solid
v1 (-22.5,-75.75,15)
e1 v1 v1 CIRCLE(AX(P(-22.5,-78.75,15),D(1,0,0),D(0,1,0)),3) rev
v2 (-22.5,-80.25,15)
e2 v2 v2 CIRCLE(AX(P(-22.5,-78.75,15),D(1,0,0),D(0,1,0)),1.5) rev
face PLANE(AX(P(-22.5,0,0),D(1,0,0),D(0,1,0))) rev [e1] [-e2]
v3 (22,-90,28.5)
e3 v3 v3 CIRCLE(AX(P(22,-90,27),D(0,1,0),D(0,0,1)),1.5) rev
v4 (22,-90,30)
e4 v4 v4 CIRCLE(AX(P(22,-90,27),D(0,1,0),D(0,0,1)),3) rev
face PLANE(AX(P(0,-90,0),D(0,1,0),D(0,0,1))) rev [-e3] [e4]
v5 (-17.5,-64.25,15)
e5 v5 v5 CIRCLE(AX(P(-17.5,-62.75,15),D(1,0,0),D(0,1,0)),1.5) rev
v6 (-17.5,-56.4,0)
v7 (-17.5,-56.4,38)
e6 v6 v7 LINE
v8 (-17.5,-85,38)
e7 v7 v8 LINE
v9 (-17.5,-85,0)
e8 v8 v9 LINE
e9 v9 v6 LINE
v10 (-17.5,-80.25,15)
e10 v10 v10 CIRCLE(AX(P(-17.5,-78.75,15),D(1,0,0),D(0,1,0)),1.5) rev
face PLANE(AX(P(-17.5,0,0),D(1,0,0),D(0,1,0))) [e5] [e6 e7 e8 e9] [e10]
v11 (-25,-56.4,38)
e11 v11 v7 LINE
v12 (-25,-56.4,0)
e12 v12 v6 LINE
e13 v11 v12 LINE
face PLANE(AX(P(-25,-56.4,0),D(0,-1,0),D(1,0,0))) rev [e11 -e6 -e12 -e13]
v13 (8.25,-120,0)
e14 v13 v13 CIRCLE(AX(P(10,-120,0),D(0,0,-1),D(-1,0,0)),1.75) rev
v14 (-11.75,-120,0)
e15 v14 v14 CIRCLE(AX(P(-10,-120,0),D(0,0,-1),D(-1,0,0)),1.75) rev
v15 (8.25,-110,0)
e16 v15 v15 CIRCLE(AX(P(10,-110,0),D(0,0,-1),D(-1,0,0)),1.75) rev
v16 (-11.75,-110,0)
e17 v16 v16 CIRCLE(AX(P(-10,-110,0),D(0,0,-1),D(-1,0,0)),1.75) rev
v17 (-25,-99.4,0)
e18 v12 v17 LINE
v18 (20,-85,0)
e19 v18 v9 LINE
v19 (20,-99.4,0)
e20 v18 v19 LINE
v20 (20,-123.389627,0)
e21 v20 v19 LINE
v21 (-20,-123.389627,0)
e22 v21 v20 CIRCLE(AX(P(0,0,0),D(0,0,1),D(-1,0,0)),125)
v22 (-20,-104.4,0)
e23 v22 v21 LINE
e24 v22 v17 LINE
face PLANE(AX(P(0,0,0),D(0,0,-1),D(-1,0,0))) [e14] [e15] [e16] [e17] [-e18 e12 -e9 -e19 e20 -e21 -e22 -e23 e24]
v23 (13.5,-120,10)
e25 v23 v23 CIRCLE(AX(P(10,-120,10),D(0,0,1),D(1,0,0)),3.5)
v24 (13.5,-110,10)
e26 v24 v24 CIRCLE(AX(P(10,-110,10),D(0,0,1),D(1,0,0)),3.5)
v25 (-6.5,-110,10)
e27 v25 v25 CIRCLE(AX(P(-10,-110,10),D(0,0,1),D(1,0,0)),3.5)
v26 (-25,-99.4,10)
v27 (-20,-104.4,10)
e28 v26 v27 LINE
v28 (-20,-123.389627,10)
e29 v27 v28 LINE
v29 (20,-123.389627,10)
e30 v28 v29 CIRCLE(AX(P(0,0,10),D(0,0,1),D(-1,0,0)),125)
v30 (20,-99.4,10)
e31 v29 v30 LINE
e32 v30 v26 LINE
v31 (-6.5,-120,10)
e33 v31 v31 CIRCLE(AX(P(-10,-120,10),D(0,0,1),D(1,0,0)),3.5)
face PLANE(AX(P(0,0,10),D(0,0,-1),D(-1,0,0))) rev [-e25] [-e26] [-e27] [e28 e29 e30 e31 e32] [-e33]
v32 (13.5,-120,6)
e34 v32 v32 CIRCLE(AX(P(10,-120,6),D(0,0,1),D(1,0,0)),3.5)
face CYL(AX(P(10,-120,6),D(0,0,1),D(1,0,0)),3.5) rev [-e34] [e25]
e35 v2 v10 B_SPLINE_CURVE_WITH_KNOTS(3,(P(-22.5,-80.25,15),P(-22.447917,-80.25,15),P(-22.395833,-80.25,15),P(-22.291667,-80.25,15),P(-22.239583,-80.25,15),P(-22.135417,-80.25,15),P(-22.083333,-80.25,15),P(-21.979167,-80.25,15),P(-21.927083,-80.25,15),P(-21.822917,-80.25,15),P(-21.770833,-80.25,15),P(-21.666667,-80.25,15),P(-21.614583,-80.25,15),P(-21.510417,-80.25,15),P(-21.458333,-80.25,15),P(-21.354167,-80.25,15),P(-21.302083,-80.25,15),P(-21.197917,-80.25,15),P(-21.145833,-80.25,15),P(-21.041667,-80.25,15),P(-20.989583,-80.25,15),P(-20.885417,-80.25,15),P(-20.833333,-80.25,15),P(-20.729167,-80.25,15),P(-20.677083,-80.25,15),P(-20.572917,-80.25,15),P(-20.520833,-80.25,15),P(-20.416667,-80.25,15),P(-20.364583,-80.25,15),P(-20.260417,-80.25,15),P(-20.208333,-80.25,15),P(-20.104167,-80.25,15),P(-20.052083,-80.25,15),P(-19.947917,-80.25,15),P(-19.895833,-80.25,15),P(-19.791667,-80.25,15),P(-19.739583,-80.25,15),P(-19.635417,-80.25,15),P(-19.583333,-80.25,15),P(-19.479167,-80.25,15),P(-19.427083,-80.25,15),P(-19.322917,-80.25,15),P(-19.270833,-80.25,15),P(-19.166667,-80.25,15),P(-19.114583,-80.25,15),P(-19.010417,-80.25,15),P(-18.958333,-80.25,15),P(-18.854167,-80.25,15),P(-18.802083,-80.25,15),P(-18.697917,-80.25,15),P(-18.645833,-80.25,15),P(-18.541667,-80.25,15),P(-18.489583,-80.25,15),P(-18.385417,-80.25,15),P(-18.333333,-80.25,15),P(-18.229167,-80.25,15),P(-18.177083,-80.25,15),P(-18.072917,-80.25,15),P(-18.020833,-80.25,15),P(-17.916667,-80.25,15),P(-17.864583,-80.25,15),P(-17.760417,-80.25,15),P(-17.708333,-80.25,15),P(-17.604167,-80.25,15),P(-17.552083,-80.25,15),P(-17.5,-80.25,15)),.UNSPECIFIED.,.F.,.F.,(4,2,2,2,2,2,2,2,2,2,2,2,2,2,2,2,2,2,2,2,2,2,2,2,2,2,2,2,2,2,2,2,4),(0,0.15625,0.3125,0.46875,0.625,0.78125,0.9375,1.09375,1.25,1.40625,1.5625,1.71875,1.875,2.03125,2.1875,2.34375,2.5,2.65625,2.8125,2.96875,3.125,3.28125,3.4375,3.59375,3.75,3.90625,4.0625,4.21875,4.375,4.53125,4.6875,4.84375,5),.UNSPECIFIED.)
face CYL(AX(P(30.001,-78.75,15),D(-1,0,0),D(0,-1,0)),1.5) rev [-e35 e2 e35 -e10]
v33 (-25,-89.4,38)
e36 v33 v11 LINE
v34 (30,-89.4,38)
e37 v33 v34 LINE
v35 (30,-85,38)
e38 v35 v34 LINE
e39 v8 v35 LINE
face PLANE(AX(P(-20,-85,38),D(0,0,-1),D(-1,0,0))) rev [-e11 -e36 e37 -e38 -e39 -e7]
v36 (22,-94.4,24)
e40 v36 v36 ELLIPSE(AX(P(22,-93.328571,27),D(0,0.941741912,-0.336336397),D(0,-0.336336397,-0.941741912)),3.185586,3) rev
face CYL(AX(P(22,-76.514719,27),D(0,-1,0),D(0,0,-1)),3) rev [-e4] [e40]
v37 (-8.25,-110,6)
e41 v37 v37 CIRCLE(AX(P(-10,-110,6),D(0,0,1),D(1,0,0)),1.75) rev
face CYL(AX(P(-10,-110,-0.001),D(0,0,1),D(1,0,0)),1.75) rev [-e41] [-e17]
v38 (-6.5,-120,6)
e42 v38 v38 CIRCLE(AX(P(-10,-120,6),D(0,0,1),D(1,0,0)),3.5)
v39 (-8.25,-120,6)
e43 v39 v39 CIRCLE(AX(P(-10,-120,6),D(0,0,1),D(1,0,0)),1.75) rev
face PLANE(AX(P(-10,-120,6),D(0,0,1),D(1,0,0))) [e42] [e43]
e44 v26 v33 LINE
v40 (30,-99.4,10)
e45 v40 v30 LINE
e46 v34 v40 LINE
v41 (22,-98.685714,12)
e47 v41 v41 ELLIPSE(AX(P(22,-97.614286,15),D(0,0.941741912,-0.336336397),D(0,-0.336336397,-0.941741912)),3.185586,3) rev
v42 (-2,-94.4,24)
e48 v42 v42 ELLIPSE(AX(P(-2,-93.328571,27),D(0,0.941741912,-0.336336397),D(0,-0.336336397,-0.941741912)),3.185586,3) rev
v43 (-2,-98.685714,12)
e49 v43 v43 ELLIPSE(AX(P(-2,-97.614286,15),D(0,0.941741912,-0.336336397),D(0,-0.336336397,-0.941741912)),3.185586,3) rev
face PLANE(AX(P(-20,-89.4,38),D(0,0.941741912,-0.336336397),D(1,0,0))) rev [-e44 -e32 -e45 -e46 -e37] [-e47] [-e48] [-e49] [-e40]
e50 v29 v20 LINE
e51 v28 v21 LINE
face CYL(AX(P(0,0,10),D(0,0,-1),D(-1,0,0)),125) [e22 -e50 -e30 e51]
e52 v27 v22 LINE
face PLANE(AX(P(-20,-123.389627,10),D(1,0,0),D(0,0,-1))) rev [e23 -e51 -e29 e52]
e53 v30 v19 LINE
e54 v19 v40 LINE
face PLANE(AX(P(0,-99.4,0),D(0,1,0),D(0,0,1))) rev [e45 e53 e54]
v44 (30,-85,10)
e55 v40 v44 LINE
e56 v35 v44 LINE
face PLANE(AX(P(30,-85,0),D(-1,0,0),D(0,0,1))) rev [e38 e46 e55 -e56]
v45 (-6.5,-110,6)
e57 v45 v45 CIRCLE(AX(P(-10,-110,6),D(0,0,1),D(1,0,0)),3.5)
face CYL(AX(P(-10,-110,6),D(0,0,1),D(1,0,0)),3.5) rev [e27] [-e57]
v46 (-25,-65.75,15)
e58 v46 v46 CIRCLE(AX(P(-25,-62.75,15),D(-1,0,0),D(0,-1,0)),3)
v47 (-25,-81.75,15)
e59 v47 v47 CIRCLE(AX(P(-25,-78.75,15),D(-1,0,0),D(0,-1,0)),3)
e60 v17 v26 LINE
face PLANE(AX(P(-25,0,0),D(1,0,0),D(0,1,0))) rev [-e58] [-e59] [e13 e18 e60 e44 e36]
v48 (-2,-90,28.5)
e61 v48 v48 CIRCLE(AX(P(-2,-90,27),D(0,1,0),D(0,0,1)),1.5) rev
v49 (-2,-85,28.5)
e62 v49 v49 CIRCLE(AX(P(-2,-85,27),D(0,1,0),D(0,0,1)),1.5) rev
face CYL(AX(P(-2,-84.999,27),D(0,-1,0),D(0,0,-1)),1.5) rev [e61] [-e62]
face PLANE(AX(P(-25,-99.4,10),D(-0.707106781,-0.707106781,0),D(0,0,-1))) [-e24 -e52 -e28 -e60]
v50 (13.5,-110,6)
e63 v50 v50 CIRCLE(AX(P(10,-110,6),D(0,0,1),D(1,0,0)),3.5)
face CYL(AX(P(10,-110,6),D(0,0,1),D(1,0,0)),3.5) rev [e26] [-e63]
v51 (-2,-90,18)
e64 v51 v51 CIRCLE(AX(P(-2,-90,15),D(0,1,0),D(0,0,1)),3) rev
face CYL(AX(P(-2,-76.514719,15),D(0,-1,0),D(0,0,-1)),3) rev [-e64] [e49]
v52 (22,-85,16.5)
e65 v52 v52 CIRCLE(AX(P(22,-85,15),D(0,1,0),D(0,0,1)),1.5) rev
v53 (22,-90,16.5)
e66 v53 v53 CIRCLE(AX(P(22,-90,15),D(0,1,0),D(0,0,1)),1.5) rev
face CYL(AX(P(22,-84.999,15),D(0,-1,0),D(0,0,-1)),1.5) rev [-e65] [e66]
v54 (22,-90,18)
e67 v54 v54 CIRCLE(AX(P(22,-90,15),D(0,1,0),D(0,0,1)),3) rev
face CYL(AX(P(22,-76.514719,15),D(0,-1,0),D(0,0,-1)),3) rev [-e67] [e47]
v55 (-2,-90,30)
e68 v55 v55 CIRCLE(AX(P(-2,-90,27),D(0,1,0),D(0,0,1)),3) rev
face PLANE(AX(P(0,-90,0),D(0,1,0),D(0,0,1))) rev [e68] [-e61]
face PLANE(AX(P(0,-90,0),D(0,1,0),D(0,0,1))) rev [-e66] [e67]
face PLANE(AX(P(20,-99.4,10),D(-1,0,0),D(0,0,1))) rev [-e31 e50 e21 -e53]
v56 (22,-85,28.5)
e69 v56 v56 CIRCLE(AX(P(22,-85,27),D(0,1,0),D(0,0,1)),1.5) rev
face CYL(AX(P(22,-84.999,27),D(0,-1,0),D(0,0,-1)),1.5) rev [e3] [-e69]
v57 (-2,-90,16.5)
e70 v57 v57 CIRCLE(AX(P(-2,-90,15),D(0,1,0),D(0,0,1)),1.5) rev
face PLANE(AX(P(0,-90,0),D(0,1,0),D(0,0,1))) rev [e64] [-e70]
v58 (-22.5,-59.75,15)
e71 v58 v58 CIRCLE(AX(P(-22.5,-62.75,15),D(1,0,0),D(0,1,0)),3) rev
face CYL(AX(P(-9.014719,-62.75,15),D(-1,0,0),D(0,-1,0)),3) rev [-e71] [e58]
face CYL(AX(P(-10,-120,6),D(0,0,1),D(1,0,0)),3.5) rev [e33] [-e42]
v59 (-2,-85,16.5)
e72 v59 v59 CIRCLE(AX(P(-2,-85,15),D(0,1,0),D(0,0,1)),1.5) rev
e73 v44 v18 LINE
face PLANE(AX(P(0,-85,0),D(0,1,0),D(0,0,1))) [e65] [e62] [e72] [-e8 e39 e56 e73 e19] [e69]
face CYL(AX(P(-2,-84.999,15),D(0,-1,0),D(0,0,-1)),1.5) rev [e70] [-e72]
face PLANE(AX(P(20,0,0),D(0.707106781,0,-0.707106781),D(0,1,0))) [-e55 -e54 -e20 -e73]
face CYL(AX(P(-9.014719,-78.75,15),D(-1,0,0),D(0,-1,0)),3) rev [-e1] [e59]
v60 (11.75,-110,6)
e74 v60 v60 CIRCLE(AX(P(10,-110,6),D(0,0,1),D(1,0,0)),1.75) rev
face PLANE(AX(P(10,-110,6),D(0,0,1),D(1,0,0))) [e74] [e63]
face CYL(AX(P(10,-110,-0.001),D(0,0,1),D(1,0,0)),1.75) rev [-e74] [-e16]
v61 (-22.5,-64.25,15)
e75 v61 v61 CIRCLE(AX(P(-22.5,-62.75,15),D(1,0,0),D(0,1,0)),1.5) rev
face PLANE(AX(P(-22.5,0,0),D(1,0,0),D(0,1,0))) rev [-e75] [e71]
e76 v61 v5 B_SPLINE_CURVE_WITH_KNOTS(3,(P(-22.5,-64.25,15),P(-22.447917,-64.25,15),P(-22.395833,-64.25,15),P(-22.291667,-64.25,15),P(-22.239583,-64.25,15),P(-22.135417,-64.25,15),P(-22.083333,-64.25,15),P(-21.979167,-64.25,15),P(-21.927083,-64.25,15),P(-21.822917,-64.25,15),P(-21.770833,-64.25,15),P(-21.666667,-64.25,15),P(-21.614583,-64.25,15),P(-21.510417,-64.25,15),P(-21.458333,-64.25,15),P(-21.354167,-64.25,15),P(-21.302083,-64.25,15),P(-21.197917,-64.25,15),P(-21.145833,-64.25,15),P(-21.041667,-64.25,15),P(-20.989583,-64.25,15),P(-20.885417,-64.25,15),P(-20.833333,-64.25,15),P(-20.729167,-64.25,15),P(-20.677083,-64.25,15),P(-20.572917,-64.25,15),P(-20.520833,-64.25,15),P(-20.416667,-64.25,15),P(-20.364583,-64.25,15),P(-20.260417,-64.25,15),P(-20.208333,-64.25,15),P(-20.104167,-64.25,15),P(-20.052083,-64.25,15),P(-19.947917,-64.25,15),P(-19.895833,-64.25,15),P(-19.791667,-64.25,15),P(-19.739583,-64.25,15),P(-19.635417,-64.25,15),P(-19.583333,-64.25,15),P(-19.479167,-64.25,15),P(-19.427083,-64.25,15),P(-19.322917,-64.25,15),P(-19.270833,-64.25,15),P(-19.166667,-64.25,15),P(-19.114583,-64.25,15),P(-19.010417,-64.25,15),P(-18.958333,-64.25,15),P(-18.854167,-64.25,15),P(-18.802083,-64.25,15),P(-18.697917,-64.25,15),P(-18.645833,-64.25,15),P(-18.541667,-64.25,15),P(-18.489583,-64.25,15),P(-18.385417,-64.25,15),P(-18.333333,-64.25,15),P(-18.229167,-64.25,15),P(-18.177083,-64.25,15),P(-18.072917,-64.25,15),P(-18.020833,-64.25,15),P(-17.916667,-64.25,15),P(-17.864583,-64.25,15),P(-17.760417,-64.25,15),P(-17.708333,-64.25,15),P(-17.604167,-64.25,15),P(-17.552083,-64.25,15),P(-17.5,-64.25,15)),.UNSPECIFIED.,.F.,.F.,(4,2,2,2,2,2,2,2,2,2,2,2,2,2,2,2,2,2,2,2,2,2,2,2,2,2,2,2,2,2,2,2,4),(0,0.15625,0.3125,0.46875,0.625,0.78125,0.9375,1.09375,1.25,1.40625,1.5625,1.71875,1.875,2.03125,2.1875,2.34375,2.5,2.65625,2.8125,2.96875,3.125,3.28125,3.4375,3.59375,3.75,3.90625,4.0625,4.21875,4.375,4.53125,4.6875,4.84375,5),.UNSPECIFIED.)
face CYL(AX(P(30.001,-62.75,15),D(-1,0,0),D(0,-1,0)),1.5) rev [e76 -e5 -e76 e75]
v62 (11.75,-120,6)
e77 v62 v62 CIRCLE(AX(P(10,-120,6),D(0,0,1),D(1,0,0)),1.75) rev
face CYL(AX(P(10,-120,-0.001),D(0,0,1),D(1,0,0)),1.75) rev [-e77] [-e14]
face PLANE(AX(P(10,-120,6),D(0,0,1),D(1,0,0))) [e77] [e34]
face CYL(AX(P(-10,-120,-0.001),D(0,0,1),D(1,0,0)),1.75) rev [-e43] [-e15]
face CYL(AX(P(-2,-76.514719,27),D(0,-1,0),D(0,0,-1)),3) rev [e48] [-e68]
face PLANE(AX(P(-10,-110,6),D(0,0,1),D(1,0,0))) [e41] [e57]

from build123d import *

# Parameters (mm, degrees)
BOSS_EXTRU_1_DEPTH      = 10
ENL_V_MAT_EXTRU_1_REACH = 128.984
ESQUISSE2_R             = 1.75
ESQUISSE4_R             = 3.5
ENL_V_MAT_EXTRU_2_DEPTH = 4
ESQUISSE5_W             = 50
ESQUISSE5_H             = 38
BOSS_EXTRU_2_DEPTH      = 14.4
ENL_V_MAT_EXTRU_3_REACH = 56.766
ESQUISSE6_R             = 1.5
ESQUISSE7_R             = 3
ENL_V_MAT_EXTRU_4_DEPTH = 9.4
CHANFREIN1_SIZE         = 10
CHANFREIN2_SIZE         = 28
CHANFREIN2_SIZE_2       = 10
BOSS_EXTRU_3_DEPTH      = 5
ESQUISSE9_W             = 38
ESQUISSE9_H             = 28.6
BOSS_EXTRU_4_DEPTH      = 2.5
CHANFREIN3_SIZE         = 5
ENL_V_MAT_EXTRU_5_REACH = 143.753
ESQUISSE10_R            = 1.5
ESQUISSE11_R            = 3
ENL_V_MAT_EXTRU_6_DEPTH = 2.5


# Some blends are built 0.0001 mm under size
with BuildPart() as part:
    # Esquisse1 → Boss.-Extru.1 (new body)
    with BuildSketch(Plane.XY):
        with BuildLine():
            Line((-20, -123.389626793), (-20, -99.4))
            Line((-20, -99.4), (20, -99.4))
            Line((20, -99.4), (20, -123.389626793))
            ThreePointArc((20, -123.389626793), (0, -125), (-20, -123.389626793))
        make_face()
    extrude(amount=BOSS_EXTRU_1_DEPTH)

    # Esquisse2 → Enlèv. mat.-Extru.1 (cut, up to next)
    with BuildSketch(Plane.XY.offset(10), mode=Mode.PRIVATE) as enl_v_mat_extru_1_sk1:
        with Locations((-10, -110)):
            Circle(ESQUISSE2_R)
    enl_v_mat_extru_1_tool1 = extrude(enl_v_mat_extru_1_sk1.sketch, amount=-ENL_V_MAT_EXTRU_1_REACH, mode=Mode.PRIVATE) & part.part
    # Esquisse2 → Enlèv. mat.-Extru.1 (cut, up to next)
    with BuildSketch(Plane.XY.offset(10), mode=Mode.PRIVATE) as enl_v_mat_extru_1_sk2:
        with Locations((-10, -120)):
            Circle(ESQUISSE2_R)
    enl_v_mat_extru_1_tool2 = extrude(enl_v_mat_extru_1_sk2.sketch, amount=-ENL_V_MAT_EXTRU_1_REACH, mode=Mode.PRIVATE) & part.part
    # Esquisse2 → Enlèv. mat.-Extru.1 (cut, up to next)
    with BuildSketch(Plane.XY.offset(10), mode=Mode.PRIVATE) as enl_v_mat_extru_1_sk3:
        with Locations((10, -110)):
            Circle(ESQUISSE2_R)
    enl_v_mat_extru_1_tool3 = extrude(enl_v_mat_extru_1_sk3.sketch, amount=-ENL_V_MAT_EXTRU_1_REACH, mode=Mode.PRIVATE) & part.part
    # Esquisse2 → Enlèv. mat.-Extru.1 (cut, up to next)
    with BuildSketch(Plane.XY.offset(10), mode=Mode.PRIVATE) as enl_v_mat_extru_1_sk4:
        with Locations((10, -120)):
            Circle(ESQUISSE2_R)
    enl_v_mat_extru_1_tool4 = extrude(enl_v_mat_extru_1_sk4.sketch, amount=-ENL_V_MAT_EXTRU_1_REACH, mode=Mode.PRIVATE) & part.part
    add(enl_v_mat_extru_1_tool1.solids().sort_by_distance((-10, -110, 10))[0], mode=Mode.SUBTRACT)
    add(enl_v_mat_extru_1_tool2.solids().sort_by_distance((-10, -120, 10))[0], mode=Mode.SUBTRACT)
    add(enl_v_mat_extru_1_tool3.solids().sort_by_distance((10, -110, 10))[0], mode=Mode.SUBTRACT)
    add(enl_v_mat_extru_1_tool4.solids().sort_by_distance((10, -120, 10))[0], mode=Mode.SUBTRACT)

    # Esquisse4 → Enlèv. mat.-Extru.2 (cut)
    with BuildSketch(Plane.XY.offset(10)):
        with Locations((-10, -110)):
            Circle(ESQUISSE4_R)
        with Locations((10, -110)):
            Circle(ESQUISSE4_R)
        with Locations((10, -120)):
            Circle(ESQUISSE4_R)
        with Locations((-10, -120)):
            Circle(ESQUISSE4_R)
    extrude(amount=-ENL_V_MAT_EXTRU_2_DEPTH, mode=Mode.SUBTRACT)

    # Esquisse5 → Boss.-Extru.2 (add)
    with BuildSketch(Plane(origin=(0, -99.4, 0), x_dir=(1, 0, 0), z_dir=(0, 1, 0))):
        with Locations((5, -19)):
            Rectangle(ESQUISSE5_W, ESQUISSE5_H)
    extrude(amount=BOSS_EXTRU_2_DEPTH)

    # Esquisse6 → Enlèv. mat.-Extru.3 (cut, up to next)
    with BuildSketch(Plane.XZ.offset(99.4), mode=Mode.PRIVATE) as enl_v_mat_extru_3_sk1:
        with Locations(Location((-2, 27, 0), (0, 0, 270))):
            Circle(ESQUISSE6_R)
    enl_v_mat_extru_3_tool1 = extrude(enl_v_mat_extru_3_sk1.sketch, amount=-ENL_V_MAT_EXTRU_3_REACH, mode=Mode.PRIVATE) & part.part
    # Esquisse6 → Enlèv. mat.-Extru.3 (cut, up to next)
    with BuildSketch(Plane.XZ.offset(99.4), mode=Mode.PRIVATE) as enl_v_mat_extru_3_sk2:
        with Locations(Location((22, 27, 0), (0, 0, 270))):
            Circle(ESQUISSE6_R)
    enl_v_mat_extru_3_tool2 = extrude(enl_v_mat_extru_3_sk2.sketch, amount=-ENL_V_MAT_EXTRU_3_REACH, mode=Mode.PRIVATE) & part.part
    # Esquisse6 → Enlèv. mat.-Extru.3 (cut, up to next)
    with BuildSketch(Plane.XZ.offset(99.4), mode=Mode.PRIVATE) as enl_v_mat_extru_3_sk3:
        with Locations(Location((-2, 15, 0), (0, 0, 270))):
            Circle(ESQUISSE6_R)
    enl_v_mat_extru_3_tool3 = extrude(enl_v_mat_extru_3_sk3.sketch, amount=-ENL_V_MAT_EXTRU_3_REACH, mode=Mode.PRIVATE) & part.part
    # Esquisse6 → Enlèv. mat.-Extru.3 (cut, up to next)
    with BuildSketch(Plane.XZ.offset(99.4), mode=Mode.PRIVATE) as enl_v_mat_extru_3_sk4:
        with Locations(Location((22, 15, 0), (0, 0, 270))):
            Circle(ESQUISSE6_R)
    enl_v_mat_extru_3_tool4 = extrude(enl_v_mat_extru_3_sk4.sketch, amount=-ENL_V_MAT_EXTRU_3_REACH, mode=Mode.PRIVATE) & part.part
    add(enl_v_mat_extru_3_tool1.solids().sort_by_distance((-2, -99.4, 27))[0], mode=Mode.SUBTRACT)
    add(enl_v_mat_extru_3_tool2.solids().sort_by_distance((22, -99.4, 27))[0], mode=Mode.SUBTRACT)
    add(enl_v_mat_extru_3_tool3.solids().sort_by_distance((-2, -99.4, 15))[0], mode=Mode.SUBTRACT)
    add(enl_v_mat_extru_3_tool4.solids().sort_by_distance((22, -99.4, 15))[0], mode=Mode.SUBTRACT)

    # Esquisse7 → Enlèv. mat.-Extru.4 (cut)
    with BuildSketch(Plane.XZ.offset(99.4)):
        with Locations(Location((-2, 27, 0), (0, 0, 270))):
            Circle(ESQUISSE7_R)
        with Locations(Location((22, 27, 0), (0, 0, 270))):
            Circle(ESQUISSE7_R)
        with Locations(Location((22, 15, 0), (0, 0, 270))):
            Circle(ESQUISSE7_R)
        with Locations(Location((-2, 15, 0), (0, 0, 270))):
            Circle(ESQUISSE7_R)
    extrude(amount=-ENL_V_MAT_EXTRU_4_DEPTH, mode=Mode.SUBTRACT)

    # Chanfrein1
    chanfrein1_edges = [part.edges().sort_by_distance(p)[0] for p in [
        (30, -92.2, 0),
    ]]
    chamfer(chanfrein1_edges, length=CHANFREIN1_SIZE)

    # Chanfrein2
    # the kernel refuses this chamfer: 28, 10 mm, written as the material it takes off along each edge
    with BuildSketch(Plane(origin=(102.642981969, -99.4, 38), x_dir=(0, -0.01296397650632004, -0.9999159641255577), z_dir=(-1, 0, 0))) as chanfrein2_piece_1:
        Polygon((CHANFREIN2_SIZE * 0.999915964126, -CHANFREIN2_SIZE * 0.0129639765063), (-CHANFREIN2_SIZE_2 * 0.0129639765063, -CHANFREIN2_SIZE_2 * 0.999915964126), (0, 0), align=None)
    extrude(amount=195.285963938, mode=Mode.SUBTRACT)

    # Esquisse8 → Boss.-Extru.3 (add)
    with BuildSketch(Plane.ZY.offset(20)):
        Polygon((10, -99.4), (0, -99.4), (0, -56.4), (38, -56.4), (38, -89.4), align=None)
    extrude(amount=BOSS_EXTRU_3_DEPTH)

    # Esquisse9 → Boss.-Extru.4 (add)
    with BuildSketch(Plane(origin=(-20, 0, 0), x_dir=(0, 0, -1), z_dir=(1, 0, 0))):
        with Locations((-19, -70.7)):
            Rectangle(ESQUISSE9_W, ESQUISSE9_H)
    extrude(amount=BOSS_EXTRU_4_DEPTH)

    # Chanfrein3
    chanfrein3_edges = [part.edges().sort_by_distance(p)[0] for p in [
        (-20, -99.4, 5),
    ]]
    chamfer(chanfrein3_edges, length=CHANFREIN3_SIZE - 0.0001)  # a hair under: the kernel refuses the full size

    # Esquisse10 → Enlèv. mat.-Extru.5 (cut, up to next)
    with BuildSketch(Plane.ZY.offset(25), mode=Mode.PRIVATE) as enl_v_mat_extru_5_sk1:
        with Locations(Location((15, -62.75, 0), (0, 0, 270))):
            Circle(ESQUISSE10_R)
    enl_v_mat_extru_5_tool1 = extrude(enl_v_mat_extru_5_sk1.sketch, amount=-ENL_V_MAT_EXTRU_5_REACH, mode=Mode.PRIVATE) & part.part
    # Esquisse10 → Enlèv. mat.-Extru.5 (cut, up to next)
    with BuildSketch(Plane.ZY.offset(25), mode=Mode.PRIVATE) as enl_v_mat_extru_5_sk2:
        with Locations(Location((15, -78.75, 0), (0, 0, 270))):
            Circle(ESQUISSE10_R)
    enl_v_mat_extru_5_tool2 = extrude(enl_v_mat_extru_5_sk2.sketch, amount=-ENL_V_MAT_EXTRU_5_REACH, mode=Mode.PRIVATE) & part.part
    add(enl_v_mat_extru_5_tool1.solids().sort_by_distance((-25, -62.75, 15))[0], mode=Mode.SUBTRACT)
    add(enl_v_mat_extru_5_tool2.solids().sort_by_distance((-25, -78.75, 15))[0], mode=Mode.SUBTRACT)

    # Esquisse11 → Enlèv. mat.-Extru.6 (cut)
    with BuildSketch(Plane.ZY.offset(25)):
        with Locations(Location((15, -62.75, 0), (0, 0, 270))):
            Circle(ESQUISSE11_R)
        with Locations(Location((15, -78.75, 0), (0, 0, 270))):
            Circle(ESQUISSE11_R)
    extrude(amount=-ENL_V_MAT_EXTRU_6_DEPTH, mode=Mode.SUBTRACT)


solid = part.part
